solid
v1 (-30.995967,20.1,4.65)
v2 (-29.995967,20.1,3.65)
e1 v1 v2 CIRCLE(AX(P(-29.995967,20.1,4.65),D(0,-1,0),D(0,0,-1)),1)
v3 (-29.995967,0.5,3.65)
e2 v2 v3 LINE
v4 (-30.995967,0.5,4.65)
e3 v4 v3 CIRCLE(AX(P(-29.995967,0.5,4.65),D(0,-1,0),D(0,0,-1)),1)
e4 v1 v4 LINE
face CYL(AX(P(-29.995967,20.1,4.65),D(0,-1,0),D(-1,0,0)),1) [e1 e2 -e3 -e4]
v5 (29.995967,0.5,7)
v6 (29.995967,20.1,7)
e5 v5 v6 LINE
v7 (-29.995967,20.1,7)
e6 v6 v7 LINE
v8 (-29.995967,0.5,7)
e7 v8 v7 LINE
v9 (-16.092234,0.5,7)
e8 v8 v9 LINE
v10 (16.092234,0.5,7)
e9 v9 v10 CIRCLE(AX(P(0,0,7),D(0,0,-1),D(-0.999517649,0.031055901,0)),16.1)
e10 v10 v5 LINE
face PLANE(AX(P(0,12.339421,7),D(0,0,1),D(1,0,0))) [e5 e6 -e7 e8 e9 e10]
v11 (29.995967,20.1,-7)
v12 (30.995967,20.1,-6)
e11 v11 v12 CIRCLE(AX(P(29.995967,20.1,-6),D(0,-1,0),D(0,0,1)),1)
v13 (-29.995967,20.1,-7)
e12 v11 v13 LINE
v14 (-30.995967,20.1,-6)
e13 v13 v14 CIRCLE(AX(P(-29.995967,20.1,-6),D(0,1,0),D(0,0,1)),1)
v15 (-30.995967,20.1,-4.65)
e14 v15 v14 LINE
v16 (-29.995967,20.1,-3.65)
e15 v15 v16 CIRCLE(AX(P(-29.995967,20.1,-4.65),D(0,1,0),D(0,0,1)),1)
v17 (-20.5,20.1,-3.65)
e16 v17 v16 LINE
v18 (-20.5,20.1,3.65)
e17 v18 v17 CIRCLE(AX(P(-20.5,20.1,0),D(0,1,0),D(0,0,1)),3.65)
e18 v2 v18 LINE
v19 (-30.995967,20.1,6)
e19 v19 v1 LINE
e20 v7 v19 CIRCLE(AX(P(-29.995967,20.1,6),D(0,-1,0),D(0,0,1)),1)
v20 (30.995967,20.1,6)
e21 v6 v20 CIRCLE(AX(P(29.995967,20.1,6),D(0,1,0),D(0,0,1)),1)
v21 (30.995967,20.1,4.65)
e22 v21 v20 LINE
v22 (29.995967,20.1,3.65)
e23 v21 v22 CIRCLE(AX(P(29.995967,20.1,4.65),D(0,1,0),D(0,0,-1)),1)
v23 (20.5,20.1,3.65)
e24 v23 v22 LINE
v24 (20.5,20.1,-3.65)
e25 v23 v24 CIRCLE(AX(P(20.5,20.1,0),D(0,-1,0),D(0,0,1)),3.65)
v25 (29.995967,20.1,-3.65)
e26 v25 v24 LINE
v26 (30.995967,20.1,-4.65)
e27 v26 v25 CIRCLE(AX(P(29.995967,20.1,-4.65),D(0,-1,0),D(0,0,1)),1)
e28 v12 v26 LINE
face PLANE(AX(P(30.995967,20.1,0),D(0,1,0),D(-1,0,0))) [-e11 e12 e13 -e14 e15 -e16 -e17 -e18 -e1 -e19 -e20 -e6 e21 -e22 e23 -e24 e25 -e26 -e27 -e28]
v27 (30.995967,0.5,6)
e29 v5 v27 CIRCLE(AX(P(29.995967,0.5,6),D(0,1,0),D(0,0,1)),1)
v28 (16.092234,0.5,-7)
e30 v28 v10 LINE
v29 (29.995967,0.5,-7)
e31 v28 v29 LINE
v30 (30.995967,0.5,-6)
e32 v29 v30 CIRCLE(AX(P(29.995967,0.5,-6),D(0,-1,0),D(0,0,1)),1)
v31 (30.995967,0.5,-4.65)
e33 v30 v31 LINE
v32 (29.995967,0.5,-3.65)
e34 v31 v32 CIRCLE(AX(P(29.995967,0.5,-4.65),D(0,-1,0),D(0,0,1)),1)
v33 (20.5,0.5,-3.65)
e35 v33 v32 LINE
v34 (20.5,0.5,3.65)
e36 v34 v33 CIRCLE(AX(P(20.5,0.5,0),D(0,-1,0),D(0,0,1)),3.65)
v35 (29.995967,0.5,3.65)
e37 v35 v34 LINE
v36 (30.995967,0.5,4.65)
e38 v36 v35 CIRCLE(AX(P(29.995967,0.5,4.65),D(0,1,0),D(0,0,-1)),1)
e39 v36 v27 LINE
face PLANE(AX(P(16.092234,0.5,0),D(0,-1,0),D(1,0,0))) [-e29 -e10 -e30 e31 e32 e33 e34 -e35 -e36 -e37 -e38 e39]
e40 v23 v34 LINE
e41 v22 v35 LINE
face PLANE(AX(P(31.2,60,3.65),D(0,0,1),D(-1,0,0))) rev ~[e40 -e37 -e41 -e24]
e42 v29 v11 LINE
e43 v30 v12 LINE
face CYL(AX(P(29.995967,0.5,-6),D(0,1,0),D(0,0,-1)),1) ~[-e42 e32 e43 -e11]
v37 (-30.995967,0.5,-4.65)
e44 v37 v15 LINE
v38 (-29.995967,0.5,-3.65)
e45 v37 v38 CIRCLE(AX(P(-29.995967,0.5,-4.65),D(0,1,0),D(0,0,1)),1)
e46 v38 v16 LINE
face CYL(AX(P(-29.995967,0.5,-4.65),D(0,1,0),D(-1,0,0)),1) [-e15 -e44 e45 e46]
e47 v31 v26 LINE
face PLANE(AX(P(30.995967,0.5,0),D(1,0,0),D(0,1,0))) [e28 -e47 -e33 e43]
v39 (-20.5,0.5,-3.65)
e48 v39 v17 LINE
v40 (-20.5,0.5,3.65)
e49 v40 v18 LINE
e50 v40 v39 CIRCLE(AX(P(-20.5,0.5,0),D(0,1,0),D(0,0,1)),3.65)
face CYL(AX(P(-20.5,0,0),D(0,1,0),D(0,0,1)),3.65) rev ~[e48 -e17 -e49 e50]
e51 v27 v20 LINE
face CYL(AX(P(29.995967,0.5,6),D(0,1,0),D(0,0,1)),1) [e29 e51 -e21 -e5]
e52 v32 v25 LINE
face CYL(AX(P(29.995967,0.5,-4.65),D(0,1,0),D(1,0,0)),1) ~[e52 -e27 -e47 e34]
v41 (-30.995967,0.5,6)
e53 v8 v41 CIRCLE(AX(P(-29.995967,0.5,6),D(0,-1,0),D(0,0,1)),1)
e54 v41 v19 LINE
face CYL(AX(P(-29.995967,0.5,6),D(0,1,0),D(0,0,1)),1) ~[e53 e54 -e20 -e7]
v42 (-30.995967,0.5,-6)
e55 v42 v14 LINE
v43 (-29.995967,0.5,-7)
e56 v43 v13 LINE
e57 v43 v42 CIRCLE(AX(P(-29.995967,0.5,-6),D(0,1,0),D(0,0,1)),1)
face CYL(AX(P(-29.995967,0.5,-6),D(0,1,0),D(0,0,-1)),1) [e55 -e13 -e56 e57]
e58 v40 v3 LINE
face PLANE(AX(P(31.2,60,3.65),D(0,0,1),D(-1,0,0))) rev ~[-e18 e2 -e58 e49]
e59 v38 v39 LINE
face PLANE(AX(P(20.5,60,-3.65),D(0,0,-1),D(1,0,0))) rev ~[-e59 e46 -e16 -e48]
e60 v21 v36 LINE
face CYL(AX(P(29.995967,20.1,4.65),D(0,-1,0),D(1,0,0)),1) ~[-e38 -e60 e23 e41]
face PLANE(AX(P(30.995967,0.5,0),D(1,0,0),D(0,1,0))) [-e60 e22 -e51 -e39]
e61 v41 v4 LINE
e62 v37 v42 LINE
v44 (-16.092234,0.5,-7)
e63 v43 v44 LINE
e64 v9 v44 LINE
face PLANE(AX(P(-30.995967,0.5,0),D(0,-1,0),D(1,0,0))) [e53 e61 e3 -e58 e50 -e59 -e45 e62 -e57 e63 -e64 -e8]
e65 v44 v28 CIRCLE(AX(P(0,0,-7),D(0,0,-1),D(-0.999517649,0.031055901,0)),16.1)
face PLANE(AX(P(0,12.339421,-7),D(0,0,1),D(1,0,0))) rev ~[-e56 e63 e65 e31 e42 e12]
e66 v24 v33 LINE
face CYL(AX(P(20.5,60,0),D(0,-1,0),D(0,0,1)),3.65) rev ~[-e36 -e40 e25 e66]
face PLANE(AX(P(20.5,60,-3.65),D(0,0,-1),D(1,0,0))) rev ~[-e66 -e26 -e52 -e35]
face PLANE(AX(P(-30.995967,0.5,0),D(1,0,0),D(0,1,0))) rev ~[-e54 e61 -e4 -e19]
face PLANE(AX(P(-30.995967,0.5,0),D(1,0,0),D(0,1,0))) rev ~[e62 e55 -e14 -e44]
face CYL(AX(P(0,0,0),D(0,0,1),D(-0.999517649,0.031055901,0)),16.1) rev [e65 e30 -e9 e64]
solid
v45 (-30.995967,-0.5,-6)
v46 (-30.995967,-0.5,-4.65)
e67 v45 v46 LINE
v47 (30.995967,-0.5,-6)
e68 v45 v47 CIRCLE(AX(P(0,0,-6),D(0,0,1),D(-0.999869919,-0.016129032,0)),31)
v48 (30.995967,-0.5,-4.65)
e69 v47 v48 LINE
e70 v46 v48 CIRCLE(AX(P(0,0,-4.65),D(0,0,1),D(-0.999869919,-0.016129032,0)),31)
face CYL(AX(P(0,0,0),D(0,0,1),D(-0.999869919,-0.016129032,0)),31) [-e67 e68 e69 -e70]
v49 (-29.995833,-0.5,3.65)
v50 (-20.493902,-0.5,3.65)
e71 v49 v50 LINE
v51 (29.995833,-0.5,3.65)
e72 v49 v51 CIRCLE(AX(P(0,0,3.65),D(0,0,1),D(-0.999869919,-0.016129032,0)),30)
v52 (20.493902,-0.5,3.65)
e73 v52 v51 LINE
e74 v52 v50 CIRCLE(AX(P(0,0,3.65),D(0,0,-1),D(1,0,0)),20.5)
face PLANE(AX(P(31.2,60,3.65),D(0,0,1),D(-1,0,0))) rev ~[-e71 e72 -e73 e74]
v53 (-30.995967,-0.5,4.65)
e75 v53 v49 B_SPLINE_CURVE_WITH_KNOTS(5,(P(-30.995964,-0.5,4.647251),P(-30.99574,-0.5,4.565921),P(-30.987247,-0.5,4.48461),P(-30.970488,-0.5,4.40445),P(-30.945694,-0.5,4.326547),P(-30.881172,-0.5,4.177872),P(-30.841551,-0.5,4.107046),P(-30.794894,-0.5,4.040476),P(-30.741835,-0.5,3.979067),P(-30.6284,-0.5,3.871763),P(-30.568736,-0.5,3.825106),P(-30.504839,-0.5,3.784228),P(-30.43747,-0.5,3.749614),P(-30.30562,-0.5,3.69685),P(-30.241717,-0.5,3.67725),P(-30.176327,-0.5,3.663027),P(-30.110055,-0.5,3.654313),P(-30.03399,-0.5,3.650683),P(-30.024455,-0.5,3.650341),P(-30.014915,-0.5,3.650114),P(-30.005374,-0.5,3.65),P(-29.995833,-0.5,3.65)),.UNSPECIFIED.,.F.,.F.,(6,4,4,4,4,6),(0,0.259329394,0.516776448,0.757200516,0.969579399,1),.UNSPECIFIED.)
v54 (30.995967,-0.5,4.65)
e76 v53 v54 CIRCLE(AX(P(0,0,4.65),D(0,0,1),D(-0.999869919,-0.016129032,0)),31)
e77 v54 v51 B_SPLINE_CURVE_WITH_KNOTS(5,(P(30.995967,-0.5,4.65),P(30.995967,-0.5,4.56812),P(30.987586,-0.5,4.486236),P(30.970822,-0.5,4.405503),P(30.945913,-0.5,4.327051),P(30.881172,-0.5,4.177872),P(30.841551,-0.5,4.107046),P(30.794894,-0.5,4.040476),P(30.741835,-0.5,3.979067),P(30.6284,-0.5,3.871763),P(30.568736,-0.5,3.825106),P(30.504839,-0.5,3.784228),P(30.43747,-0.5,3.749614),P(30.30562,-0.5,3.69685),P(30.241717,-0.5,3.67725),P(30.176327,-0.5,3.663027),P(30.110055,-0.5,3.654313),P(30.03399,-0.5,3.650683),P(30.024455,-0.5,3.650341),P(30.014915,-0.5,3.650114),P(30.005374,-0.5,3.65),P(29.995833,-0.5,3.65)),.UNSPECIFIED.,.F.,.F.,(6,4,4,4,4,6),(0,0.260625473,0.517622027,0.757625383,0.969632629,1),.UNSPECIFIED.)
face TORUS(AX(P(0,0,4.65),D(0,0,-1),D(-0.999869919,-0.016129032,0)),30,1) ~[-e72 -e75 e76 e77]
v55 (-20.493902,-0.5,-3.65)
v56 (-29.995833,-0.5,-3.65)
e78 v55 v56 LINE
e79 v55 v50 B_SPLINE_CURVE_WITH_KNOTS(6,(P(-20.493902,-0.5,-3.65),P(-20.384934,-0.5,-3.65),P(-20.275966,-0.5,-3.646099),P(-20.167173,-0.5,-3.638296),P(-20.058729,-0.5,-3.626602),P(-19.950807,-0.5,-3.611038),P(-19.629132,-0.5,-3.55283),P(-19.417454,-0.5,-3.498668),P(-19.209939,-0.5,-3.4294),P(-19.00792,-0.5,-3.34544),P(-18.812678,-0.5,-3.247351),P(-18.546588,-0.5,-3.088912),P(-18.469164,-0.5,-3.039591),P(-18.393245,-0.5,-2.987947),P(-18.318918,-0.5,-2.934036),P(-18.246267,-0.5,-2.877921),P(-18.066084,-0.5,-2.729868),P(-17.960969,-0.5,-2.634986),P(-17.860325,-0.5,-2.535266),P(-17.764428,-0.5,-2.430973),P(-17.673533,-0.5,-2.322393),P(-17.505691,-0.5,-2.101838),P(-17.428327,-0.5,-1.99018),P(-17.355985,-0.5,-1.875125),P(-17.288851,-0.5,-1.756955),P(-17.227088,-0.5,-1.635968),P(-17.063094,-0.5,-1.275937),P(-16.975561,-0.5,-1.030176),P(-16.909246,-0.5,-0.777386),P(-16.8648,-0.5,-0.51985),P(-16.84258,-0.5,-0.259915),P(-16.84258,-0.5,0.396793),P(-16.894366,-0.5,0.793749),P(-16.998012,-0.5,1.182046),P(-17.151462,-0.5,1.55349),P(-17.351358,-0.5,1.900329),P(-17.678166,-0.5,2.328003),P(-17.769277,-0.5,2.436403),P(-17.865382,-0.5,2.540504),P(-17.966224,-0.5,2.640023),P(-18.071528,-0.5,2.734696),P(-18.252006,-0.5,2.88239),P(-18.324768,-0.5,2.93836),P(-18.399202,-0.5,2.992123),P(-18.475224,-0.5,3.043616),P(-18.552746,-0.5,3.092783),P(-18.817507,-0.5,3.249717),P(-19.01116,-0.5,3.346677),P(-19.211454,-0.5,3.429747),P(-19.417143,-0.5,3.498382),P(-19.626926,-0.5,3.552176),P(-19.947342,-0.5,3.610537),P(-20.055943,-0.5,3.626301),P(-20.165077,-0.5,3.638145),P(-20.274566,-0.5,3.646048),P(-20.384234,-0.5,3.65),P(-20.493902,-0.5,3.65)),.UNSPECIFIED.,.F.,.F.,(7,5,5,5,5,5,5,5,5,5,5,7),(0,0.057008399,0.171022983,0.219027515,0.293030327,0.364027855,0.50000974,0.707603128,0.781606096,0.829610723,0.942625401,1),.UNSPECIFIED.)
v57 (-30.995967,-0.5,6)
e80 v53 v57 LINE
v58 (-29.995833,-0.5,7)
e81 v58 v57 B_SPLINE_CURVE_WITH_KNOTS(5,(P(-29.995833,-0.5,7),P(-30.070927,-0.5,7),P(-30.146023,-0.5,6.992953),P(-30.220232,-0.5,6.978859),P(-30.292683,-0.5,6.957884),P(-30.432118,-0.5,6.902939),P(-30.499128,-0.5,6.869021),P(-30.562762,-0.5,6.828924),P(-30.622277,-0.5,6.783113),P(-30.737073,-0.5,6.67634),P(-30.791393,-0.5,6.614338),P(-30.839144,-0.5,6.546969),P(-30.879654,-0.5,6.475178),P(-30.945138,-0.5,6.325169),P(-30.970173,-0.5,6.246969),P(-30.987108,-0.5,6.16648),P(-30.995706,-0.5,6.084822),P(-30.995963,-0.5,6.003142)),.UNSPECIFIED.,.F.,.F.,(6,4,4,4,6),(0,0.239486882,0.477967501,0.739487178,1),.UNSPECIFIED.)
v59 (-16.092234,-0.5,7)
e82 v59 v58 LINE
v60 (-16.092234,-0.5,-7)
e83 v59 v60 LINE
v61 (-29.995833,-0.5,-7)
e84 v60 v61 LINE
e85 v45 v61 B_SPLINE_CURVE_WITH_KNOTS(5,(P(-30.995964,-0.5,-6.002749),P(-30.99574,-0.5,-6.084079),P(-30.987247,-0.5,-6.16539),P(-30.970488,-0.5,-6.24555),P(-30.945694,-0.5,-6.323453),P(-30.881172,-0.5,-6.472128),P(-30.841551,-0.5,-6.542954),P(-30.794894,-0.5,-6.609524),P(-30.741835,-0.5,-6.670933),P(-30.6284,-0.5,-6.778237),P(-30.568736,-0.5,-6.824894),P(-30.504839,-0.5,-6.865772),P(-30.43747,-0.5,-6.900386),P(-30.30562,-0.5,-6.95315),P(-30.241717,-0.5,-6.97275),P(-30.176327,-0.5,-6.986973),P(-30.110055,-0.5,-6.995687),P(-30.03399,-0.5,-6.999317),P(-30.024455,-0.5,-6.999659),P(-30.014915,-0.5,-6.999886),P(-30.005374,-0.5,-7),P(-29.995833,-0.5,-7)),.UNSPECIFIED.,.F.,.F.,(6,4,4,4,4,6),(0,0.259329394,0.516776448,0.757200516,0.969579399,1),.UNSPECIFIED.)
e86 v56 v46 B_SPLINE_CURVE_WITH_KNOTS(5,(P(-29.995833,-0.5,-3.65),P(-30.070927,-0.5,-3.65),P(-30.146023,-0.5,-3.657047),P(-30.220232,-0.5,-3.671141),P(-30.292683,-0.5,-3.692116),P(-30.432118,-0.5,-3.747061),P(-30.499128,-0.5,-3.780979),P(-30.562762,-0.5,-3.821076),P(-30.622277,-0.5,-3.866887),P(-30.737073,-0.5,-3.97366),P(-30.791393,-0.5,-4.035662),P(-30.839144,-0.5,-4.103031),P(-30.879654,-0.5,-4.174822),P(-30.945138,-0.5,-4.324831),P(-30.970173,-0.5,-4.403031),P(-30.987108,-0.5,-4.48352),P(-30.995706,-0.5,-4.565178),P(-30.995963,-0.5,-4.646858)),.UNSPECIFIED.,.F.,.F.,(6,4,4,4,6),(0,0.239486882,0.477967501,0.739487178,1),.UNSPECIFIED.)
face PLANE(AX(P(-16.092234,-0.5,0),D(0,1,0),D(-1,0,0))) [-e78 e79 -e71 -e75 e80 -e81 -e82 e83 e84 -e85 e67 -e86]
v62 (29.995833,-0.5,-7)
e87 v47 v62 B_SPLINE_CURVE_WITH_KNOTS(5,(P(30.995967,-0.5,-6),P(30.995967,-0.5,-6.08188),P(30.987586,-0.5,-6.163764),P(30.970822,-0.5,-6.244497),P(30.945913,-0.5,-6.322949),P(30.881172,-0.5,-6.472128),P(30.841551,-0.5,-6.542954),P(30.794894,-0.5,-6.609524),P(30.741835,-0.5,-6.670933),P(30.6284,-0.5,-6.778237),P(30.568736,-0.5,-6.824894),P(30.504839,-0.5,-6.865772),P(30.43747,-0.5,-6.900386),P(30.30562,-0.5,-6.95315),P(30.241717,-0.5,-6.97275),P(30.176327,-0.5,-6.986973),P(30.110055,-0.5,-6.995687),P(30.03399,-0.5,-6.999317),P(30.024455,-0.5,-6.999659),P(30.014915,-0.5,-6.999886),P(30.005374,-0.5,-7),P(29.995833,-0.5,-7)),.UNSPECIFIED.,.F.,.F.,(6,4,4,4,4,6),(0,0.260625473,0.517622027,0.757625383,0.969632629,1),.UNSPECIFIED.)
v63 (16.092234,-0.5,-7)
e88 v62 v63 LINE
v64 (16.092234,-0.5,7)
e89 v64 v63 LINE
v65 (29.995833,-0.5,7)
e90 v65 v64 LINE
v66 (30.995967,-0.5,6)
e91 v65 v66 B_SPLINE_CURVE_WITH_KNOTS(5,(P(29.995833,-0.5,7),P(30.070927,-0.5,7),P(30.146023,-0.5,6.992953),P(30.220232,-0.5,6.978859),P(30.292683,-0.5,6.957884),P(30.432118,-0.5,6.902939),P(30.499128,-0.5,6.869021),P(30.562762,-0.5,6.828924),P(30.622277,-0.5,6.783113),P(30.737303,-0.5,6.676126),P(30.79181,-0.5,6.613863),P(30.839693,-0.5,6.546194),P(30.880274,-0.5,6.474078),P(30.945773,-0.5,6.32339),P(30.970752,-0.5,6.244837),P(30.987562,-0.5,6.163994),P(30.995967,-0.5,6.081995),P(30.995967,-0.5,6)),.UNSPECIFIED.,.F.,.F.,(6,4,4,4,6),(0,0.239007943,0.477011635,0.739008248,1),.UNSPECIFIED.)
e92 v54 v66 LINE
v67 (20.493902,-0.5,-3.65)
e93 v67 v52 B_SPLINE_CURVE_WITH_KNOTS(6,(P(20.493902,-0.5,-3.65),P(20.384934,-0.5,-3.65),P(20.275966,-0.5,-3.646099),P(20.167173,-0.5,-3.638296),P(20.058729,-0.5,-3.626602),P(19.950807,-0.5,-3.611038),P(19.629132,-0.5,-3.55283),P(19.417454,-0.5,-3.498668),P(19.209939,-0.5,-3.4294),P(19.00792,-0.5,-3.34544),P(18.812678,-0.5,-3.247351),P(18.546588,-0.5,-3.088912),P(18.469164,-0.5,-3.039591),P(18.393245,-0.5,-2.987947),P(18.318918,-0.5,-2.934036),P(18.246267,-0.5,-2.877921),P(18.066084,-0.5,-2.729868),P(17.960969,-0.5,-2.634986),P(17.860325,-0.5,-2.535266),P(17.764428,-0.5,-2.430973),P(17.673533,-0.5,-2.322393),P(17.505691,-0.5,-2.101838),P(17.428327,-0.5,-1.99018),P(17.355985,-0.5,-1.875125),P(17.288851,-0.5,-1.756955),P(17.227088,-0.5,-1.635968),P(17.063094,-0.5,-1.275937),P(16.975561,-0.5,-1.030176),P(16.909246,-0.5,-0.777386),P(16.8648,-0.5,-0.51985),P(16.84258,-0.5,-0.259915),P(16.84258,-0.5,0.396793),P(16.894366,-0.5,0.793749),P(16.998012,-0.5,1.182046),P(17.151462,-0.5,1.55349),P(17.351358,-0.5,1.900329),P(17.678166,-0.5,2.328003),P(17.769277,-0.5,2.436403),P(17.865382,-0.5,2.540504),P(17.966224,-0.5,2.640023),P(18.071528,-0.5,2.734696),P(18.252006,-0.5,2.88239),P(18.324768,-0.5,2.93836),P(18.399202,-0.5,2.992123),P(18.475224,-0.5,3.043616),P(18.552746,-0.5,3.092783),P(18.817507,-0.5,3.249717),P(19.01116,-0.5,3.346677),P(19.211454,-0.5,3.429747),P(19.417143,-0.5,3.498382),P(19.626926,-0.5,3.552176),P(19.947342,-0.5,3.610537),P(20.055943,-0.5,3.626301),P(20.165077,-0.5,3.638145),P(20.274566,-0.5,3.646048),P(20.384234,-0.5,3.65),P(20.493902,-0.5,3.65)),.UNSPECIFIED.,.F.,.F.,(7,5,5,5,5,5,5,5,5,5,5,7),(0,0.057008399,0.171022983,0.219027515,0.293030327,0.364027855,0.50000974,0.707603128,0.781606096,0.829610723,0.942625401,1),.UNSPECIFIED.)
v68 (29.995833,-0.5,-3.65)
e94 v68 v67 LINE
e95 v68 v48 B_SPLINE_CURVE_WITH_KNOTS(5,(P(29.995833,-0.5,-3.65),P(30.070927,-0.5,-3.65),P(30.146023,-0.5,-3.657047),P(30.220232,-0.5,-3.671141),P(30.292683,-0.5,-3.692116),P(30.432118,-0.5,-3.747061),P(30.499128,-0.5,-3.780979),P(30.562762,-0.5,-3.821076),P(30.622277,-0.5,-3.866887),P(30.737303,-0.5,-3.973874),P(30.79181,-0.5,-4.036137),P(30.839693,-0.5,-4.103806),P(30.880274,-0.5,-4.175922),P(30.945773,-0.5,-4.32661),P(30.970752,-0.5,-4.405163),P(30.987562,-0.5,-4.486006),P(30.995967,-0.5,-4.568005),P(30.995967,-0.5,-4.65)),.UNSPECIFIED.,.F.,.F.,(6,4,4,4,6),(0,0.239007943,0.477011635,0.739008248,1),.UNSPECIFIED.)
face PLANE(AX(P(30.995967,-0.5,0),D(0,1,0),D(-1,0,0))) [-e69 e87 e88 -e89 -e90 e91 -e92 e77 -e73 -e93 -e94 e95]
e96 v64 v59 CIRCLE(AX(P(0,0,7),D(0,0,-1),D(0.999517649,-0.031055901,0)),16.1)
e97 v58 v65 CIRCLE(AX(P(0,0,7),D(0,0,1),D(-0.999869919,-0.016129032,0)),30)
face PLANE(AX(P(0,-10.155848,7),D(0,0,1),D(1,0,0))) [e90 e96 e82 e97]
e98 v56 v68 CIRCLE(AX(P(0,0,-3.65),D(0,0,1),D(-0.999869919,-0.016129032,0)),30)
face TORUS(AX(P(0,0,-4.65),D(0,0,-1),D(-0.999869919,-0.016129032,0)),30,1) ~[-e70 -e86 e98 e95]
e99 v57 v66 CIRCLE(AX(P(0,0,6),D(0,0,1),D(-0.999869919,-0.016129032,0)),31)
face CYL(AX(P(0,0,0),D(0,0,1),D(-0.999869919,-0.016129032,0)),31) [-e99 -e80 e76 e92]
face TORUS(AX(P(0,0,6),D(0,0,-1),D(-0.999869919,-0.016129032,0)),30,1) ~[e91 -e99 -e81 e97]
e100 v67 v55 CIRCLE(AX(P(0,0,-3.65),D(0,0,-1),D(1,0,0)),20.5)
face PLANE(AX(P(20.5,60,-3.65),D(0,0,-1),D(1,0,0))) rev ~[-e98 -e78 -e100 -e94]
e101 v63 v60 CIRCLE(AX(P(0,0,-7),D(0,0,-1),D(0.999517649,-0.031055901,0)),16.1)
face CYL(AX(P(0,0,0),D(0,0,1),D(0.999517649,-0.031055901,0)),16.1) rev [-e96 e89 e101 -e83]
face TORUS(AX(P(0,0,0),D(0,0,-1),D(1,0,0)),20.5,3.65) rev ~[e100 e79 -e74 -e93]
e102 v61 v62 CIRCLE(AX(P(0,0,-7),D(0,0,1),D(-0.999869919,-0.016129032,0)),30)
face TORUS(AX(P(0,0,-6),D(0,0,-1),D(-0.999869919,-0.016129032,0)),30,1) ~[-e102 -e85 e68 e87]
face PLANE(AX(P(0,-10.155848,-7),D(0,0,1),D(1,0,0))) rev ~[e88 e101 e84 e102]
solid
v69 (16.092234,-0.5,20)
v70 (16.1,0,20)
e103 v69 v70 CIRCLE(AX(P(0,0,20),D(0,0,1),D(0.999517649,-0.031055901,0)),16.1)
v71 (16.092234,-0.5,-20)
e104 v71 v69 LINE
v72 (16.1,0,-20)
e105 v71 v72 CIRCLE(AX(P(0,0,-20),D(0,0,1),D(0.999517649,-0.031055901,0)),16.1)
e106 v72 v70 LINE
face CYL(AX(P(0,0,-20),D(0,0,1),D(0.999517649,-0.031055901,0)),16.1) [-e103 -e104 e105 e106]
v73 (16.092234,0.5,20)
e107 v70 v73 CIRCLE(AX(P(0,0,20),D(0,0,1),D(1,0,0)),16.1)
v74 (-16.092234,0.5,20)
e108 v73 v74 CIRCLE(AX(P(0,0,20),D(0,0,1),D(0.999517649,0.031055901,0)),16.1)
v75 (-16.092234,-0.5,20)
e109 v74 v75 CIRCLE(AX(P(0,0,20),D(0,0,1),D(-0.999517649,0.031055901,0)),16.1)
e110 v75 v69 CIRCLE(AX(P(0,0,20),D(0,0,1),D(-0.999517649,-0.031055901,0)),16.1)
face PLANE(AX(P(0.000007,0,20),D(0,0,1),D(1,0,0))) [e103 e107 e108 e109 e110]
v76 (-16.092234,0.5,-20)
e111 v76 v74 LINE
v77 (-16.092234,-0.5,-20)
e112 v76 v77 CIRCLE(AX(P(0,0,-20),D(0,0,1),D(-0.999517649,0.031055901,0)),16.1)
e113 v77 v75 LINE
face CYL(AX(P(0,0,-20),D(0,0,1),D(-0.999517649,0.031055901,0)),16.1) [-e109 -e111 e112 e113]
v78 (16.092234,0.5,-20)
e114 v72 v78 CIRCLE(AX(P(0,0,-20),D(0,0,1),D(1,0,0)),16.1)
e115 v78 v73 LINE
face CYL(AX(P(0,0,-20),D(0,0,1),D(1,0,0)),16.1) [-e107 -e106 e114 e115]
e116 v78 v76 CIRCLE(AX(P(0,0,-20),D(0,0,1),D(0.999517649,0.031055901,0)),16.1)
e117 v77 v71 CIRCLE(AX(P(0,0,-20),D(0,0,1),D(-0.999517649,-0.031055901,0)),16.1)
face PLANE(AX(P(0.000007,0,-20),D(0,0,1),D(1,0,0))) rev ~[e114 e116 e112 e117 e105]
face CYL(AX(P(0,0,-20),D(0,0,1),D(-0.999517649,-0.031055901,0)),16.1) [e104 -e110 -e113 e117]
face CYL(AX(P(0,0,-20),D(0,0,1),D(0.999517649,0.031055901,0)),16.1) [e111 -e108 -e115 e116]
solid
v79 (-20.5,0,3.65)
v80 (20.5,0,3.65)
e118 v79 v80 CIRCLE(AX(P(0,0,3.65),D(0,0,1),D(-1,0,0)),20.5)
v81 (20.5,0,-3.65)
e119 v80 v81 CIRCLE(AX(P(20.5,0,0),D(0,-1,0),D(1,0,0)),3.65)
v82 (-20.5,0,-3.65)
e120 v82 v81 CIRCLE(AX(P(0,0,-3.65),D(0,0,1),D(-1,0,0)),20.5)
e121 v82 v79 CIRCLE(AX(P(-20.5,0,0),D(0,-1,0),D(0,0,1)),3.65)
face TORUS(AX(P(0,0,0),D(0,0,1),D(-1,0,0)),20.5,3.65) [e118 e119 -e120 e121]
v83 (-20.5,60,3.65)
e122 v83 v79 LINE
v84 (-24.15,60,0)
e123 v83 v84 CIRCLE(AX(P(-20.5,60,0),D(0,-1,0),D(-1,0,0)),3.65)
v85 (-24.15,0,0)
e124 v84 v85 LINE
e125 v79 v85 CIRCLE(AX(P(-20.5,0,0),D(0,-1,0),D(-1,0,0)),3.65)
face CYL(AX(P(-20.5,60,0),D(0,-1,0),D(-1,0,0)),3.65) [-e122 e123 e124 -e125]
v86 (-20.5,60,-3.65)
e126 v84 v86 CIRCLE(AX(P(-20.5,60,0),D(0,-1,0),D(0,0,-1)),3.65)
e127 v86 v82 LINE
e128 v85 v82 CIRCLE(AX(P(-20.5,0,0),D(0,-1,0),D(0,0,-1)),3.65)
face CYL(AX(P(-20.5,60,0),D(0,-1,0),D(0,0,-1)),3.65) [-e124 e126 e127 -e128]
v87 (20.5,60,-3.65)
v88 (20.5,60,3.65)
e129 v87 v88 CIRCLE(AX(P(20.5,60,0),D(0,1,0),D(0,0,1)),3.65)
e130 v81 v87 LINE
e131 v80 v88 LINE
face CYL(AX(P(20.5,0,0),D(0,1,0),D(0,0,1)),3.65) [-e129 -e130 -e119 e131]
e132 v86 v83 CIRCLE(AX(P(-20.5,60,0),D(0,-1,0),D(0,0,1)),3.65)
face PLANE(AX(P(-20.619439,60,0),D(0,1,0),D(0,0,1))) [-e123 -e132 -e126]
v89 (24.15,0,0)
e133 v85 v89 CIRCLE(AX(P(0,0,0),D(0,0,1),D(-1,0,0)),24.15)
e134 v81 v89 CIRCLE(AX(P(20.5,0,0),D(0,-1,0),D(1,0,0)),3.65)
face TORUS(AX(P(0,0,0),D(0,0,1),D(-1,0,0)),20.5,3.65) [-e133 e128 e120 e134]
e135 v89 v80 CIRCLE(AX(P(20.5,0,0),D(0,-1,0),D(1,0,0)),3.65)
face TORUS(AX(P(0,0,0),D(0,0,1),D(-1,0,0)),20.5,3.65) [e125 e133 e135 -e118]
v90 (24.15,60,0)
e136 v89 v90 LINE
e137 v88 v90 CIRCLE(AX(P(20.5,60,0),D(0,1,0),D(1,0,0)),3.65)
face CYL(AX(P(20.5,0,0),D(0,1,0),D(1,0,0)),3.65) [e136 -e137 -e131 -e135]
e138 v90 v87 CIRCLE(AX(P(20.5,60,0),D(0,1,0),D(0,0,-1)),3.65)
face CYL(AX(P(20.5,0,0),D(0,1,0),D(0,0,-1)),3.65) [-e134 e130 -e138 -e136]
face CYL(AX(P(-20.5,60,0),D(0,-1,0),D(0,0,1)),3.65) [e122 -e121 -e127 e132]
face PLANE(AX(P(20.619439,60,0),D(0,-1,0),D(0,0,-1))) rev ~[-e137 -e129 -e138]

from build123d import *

# Parameters (mm, degrees)
F0_W          = 10.4959674797
F0_H          = 19.6
F4_DEPTH      = 7
F4_DEPTH_BACK = 7
F6_R          = 1
F6_2_R        = 1


with BuildPart() as f2:
    # F2: sweep along a path in F0
    with BuildLine(Plane.XY) as f2_path:
        Line((-20.5, 60), (-20.5, 0))
        ThreePointArc((-20.5, 0), (0, -20.5), (20.5, 0))
        Line((20.5, 0), (20.5, 60))
    # F1 (on Front) → F2 (sweep)
    with BuildSketch(Plane.XZ):
        with BuildLine():
            ThreePointArc((20.5, -3.65), (23.0809397513, -2.5809397513), (24.15, 0))
            ThreePointArc((24.15, 0), (23.0809397513, 2.5809397513), (20.5, 3.65))
            ThreePointArc((20.5, 3.65), (16.85, 0), (20.5, -3.65))
        make_face()
    sweep(path=f2_path.line)


with BuildPart() as f3:
    # F3: sweep along a path in F1
    with BuildLine(Plane.XZ) as f3_path:
        Line((0, -20), (0, 0))
        Line((0, 0), (0, 20))
    # F0 (on Top) → F3 (sweep)
    with BuildSketch(Plane.XY):
        with BuildLine():
            ThreePointArc((-16.0922341519, 0.5), (-16.1, 0), (-16.0922341519, -0.5))
            Line((-16.0922341519, -0.5), (16.0922341519, -0.5))
            ThreePointArc((16.0922341519, -0.5), (16.0980584209, -0.2500301524), (16.1, 0))
            ThreePointArc((16.1, 0), (16.0980584209, 0.2500301524), (16.0922341519, 0.5))
            Line((16.0922341519, 0.5), (-16.0922341519, 0.5))
        make_face()
        with BuildLine():
            ThreePointArc((16.0922341519, 0.5), (0, 16.1), (-16.0922341519, 0.5))
            Line((-16.0922341519, 0.5), (16.0922341519, 0.5))
        make_face()
        with BuildLine():
            Line((16.0922341519, -0.5), (-16.0922341519, -0.5))
            ThreePointArc((-16.0922341519, -0.5), (0, -16.1), (16.0922341519, -0.5))
        make_face()
    sweep(path=f3_path.line)


with BuildPart() as f4:
    # F0 (on Top) → F4 (new body, two sides)
    with BuildSketch(Plane.XY) as f4_sk:
        with BuildLine():
            Line((-20.5, 20.1), (-20.5, 0.5))
            Line((-20.5, 0.5), (-16.0922341519, 0.5))
            ThreePointArc((-16.0922341519, 0.5), (0, 16.1), (16.0922341519, 0.5))
            Line((16.0922341519, 0.5), (20.5, 0.5))
            Line((20.5, 0.5), (20.5, 20.1))
            Line((20.5, 20.1), (-20.5, 20.1))
        make_face()
        with Locations((-25.7479837398, 10.3)):
            Rectangle(F0_W, F0_H)
        with Locations((25.7479837398, 10.3)):
            Rectangle(F0_W, F0_H)
    extrude(amount=F4_DEPTH)
    extrude(f4_sk.sketch, amount=-F4_DEPTH_BACK)


with BuildPart() as f4b:
    # F0 (on Top) → F4, piece 2 (new body, two sides)
    with BuildSketch(Plane.XY) as f4_2_sk:
        with BuildLine():
            Line((-16.0922341519, -0.5), (-20.4939015319, -0.5))
            ThreePointArc((-20.4939015319, -0.5), (0, -20.5), (20.4939015319, -0.5))
            Line((20.4939015319, -0.5), (16.0922341519, -0.5))
            ThreePointArc((16.0922341519, -0.5), (0, -16.1), (-16.0922341519, -0.5))
        make_face()
        with BuildLine():
            ThreePointArc((20.4939015319, -0.5), (0, -20.5), (-20.4939015319, -0.5))
            Line((-20.4939015319, -0.5), (-30.9959674797, -0.5))
            ThreePointArc((-30.9959674797, -0.5), (0, -31), (30.9959674797, -0.5))
            Line((30.9959674797, -0.5), (20.4939015319, -0.5))
        make_face()
    extrude(amount=F4_DEPTH)
    extrude(f4_2_sk.sketch, amount=-F4_DEPTH_BACK)


with BuildPart() as f5_tool:
    # F5: sweep along a path in F0
    with BuildLine(Plane.XY) as f5_path:
        Line((20.5, 60), (20.5, 0))
        ThreePointArc((20.5, 0), (0, -20.5), (-20.5, 0))
        Line((-20.5, 0), (-20.5, 60))
    # F1 (on Front) → F5 (sweep)
    with BuildSketch(Plane.XZ):
        with BuildLine():
            ThreePointArc((20.5, -3.65), (23.0809397513, -2.5809397513), (24.15, 0))
            ThreePointArc((24.15, 0), (23.0809397513, 2.5809397513), (20.5, 3.65))
            ThreePointArc((20.5, 3.65), (16.85, 0), (20.5, -3.65))
        make_face()
        with BuildLine():
            ThreePointArc((20.5, 3.65), (23.0809397513, 2.5809397513), (24.15, 0))
            ThreePointArc((24.15, 0), (23.0809397513, -2.5809397513), (20.5, -3.65))
            Line((20.5, -3.65), (31.2, -3.65))
            Line((31.2, -3.65), (31.2, 3.65))
            Line((31.2, 3.65), (20.5, 3.65))
        make_face()
    sweep(path=f5_path.line)


with BuildPart() as f4_1:
    add(f4.part)

    # F5: cut by f5_tool
    add(f5_tool.part, mode=Mode.SUBTRACT)

    # F6
    f6_edges = [f4_1.edges().sort_by_distance(p)[0] for p in [
        (30.995967, 10.3, 7),
        (30.995967, 10.3, 3.65),
        (30.995967, 10.3, -7),
        (-30.995967, 10.3, 7),
        (-30.995967, 10.3, -7),
        (-30.995967, 10.3, 3.65),
        (-30.995967, 10.3, -3.65),
        (30.995967, 10.3, -3.65),
    ]]
    fillet(f6_edges, radius=F6_R)


with BuildPart() as f4b_1:
    add(f4b.part)

    # F5: cut by f5_tool
    add(f5_tool.part, mode=Mode.SUBTRACT)

    # F6#2
    f6_2_edges = [f4b_1.edges().sort_by_distance(p)[0] for p in [
        (0, -31, -7),
        (0, -31, 7),
        (0, -31, -3.65),
        (0, -31, 3.65),
    ]]
    fillet(f6_2_edges, radius=F6_2_R)


solid = Compound([f2.part, f3.part, f4_1.part, f4b_1.part])
